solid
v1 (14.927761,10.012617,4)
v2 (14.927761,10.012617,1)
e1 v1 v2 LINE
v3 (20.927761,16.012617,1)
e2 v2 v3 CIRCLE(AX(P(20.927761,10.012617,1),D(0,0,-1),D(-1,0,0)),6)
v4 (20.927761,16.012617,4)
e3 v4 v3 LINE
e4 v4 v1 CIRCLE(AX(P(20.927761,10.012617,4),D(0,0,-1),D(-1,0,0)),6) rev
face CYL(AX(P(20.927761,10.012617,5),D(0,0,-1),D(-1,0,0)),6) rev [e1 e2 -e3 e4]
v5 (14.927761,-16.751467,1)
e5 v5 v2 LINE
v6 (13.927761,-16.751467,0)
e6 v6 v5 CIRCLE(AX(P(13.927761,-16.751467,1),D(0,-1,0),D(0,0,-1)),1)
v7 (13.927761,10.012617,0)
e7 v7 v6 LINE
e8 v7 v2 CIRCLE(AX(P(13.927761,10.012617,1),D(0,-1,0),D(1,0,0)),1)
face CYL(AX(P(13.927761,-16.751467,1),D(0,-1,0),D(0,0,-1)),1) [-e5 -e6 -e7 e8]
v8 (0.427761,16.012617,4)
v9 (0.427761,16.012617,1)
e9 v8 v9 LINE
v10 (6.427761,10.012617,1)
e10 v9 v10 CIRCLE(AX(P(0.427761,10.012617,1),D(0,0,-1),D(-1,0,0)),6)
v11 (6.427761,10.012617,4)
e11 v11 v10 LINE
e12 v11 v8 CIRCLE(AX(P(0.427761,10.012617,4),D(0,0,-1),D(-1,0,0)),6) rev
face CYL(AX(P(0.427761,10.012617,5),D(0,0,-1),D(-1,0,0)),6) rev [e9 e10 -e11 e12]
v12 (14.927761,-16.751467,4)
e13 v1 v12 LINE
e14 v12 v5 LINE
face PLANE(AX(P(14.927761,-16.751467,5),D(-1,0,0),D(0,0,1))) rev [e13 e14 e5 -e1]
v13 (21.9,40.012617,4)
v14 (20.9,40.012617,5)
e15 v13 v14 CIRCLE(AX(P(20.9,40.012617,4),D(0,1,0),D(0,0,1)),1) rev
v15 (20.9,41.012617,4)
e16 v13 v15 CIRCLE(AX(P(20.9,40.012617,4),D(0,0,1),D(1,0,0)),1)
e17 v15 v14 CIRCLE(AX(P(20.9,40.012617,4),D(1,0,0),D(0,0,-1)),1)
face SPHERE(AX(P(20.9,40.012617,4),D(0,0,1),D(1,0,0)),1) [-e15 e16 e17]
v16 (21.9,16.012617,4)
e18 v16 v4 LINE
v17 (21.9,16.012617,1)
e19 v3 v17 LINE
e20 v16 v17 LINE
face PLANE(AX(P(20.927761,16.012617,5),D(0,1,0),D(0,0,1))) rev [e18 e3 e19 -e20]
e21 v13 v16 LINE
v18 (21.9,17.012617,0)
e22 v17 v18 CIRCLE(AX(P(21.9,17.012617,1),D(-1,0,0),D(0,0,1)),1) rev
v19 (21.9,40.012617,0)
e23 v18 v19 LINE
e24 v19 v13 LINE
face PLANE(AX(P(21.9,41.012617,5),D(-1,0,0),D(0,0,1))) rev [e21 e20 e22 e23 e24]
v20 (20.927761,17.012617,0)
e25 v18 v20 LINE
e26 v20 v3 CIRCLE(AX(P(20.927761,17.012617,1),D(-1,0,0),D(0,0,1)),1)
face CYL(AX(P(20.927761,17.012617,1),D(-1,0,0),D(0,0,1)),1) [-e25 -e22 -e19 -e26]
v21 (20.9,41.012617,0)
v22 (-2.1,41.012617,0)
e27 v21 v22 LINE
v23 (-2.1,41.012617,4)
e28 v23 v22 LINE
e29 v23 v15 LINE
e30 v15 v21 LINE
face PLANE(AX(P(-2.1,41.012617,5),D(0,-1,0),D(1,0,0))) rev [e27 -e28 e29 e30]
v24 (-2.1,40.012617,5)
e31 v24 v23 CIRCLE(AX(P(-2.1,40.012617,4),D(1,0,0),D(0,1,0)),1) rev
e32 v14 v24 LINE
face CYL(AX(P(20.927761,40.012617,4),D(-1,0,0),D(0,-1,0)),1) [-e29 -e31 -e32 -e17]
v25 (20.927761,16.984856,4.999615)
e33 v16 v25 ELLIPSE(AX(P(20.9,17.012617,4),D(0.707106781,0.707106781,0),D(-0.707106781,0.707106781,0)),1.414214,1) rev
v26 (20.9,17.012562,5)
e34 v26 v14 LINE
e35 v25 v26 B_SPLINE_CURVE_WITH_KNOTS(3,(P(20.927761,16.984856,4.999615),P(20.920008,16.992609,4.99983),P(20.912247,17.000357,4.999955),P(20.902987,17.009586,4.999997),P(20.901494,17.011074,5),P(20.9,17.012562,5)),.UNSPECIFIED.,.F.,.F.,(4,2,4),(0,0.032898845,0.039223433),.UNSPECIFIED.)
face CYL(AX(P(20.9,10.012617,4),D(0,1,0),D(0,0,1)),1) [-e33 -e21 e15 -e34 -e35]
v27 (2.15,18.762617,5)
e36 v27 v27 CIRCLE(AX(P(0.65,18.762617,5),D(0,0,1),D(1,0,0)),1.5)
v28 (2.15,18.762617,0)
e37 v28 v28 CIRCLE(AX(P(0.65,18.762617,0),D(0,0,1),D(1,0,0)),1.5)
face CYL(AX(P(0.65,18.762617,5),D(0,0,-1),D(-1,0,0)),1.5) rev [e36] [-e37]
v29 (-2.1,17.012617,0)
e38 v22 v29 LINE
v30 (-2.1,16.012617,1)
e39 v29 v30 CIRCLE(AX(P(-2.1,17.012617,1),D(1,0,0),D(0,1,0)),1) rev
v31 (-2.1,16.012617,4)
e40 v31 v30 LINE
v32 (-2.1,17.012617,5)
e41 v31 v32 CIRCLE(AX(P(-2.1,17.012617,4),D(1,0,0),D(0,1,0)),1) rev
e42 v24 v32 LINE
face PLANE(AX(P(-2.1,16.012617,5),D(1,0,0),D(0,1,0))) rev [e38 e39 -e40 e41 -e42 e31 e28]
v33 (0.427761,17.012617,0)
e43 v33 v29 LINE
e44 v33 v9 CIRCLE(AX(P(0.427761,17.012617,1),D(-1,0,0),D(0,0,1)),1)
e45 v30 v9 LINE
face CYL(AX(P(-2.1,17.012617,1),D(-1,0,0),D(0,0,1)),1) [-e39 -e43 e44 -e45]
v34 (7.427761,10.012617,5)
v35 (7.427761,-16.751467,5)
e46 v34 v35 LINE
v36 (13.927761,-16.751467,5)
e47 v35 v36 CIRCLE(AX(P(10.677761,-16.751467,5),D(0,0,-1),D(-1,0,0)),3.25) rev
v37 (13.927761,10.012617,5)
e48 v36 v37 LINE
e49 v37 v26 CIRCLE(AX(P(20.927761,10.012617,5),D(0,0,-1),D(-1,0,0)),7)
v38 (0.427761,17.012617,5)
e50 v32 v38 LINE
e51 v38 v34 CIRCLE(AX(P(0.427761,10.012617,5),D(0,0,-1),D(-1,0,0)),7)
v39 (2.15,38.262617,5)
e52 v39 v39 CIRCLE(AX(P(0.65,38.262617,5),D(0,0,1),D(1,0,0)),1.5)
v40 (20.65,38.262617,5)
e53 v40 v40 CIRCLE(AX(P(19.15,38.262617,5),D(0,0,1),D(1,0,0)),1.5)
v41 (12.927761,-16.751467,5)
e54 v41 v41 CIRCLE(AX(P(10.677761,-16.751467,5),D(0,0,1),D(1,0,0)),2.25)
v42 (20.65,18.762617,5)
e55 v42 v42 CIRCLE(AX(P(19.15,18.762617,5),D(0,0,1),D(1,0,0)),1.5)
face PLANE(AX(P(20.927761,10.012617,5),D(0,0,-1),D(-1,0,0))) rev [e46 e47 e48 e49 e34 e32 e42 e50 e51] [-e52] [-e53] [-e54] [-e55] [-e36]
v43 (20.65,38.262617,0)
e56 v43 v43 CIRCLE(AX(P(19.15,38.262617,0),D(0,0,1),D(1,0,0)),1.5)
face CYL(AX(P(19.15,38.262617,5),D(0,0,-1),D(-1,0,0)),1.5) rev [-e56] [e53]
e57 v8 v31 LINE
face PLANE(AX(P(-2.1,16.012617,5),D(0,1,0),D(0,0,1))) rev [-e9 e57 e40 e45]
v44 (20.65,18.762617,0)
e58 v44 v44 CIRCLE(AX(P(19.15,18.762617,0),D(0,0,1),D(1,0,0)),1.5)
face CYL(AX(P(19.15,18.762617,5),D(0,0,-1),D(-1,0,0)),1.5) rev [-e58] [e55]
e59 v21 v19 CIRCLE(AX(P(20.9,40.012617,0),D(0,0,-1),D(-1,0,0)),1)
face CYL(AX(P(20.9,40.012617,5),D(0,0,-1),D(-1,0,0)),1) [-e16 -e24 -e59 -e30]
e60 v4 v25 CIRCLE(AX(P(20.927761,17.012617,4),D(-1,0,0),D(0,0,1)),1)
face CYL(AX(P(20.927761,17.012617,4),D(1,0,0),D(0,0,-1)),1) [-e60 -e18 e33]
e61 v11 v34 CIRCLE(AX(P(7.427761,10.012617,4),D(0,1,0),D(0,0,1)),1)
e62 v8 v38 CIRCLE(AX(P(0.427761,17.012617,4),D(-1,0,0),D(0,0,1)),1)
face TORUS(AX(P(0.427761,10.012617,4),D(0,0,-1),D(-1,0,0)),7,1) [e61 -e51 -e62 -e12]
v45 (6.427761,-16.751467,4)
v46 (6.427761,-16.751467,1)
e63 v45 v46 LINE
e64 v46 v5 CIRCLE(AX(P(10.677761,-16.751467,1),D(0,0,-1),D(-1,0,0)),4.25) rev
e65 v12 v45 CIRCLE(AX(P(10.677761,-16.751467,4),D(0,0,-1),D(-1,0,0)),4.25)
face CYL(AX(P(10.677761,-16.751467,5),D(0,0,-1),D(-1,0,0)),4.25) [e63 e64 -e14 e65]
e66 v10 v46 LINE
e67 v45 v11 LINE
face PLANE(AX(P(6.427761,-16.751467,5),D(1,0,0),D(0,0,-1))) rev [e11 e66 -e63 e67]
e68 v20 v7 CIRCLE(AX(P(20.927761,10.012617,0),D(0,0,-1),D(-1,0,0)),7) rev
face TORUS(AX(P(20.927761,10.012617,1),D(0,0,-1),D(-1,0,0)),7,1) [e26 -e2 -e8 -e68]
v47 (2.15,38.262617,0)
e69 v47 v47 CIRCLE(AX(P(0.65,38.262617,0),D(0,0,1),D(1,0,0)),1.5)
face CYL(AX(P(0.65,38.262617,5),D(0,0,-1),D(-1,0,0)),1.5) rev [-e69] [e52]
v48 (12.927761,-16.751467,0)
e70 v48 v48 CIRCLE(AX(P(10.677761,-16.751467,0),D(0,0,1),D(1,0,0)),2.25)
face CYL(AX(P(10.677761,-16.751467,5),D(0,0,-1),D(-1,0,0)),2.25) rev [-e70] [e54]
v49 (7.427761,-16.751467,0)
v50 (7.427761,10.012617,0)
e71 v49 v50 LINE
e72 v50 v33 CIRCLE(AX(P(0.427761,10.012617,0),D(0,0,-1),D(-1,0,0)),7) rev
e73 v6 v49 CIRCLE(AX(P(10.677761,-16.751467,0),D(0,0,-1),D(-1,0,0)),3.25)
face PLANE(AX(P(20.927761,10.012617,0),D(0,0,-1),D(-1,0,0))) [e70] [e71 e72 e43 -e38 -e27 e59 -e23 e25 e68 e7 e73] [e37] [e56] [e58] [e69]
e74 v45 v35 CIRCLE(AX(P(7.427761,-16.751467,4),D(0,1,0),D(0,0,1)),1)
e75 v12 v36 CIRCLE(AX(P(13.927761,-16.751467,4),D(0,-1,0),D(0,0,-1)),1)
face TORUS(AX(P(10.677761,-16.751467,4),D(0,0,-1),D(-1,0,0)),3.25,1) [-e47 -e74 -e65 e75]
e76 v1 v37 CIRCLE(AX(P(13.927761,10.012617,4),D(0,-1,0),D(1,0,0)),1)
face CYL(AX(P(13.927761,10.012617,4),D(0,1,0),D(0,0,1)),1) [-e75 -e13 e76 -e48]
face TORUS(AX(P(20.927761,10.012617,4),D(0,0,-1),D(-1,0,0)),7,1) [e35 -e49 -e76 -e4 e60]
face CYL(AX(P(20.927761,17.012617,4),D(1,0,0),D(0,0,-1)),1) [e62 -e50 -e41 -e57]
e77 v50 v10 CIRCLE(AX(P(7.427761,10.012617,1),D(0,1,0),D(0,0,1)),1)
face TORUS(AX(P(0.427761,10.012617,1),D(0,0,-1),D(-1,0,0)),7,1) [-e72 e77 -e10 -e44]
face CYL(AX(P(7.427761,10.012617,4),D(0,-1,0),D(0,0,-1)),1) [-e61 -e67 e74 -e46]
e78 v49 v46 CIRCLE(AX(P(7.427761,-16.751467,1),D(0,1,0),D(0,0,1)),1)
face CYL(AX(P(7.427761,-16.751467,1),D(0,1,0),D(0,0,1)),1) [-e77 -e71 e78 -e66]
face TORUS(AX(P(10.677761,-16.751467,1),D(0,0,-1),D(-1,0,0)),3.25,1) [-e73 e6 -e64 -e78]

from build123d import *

# Parameters (mm, degrees)
CROQUIS1_R              = 2.2500000000000027
CROQUIS1_R_2            = 1.5000000000000013
CROQUIS1_R_3            = 1.5000000000000009
CROQUIS1_R_4            = 1.4999999999999967
SALIENTE_EXTRUIR1_DEPTH = 5
REDONDEO1_R             = 1


with BuildPart() as part:
    # Croquis1 → Saliente-Extruir1 (new body)
    with BuildSketch(Plane.XY):
        with BuildLine():
            Line((-2.100000000000147, 41.01261693614467), (21.89999999999985, 41.01261693614466))
            Line((21.89999999999985, 41.01261693614466), (21.89999999999985, 16.01261693614466))
            Line((21.89999999999985, 16.01261693614466), (20.92776114455846, 16.01261693614466))
            ThreePointArc((20.92776114455846, 16.01261693614466), (16.68512045743913, 14.255257623263944), (14.927761144558415, 10.012616936144616))
            Line((14.927761144558415, 10.012616936144616), (14.927761144558415, -16.751467205989318))
            ThreePointArc((14.927761144558415, -16.751467205989318), (10.677761144558414, -21.001467205989325), (6.427761144558411, -16.751467205989318))
            Line((6.427761144558411, -16.751467205989318), (6.427761144558411, 10.012616936144616))
            ThreePointArc((6.427761144558411, 10.012616936144616), (4.670401831677697, 14.255257623263944), (0.42776114455836833, 16.01261693614466))
            Line((0.42776114455836833, 16.01261693614466), (-2.100000000000148, 16.01261693614466))
            Line((-2.100000000000148, 16.01261693614466), (-2.100000000000147, 41.01261693614467))
        make_face()
        with Locations((10.677761144558414, -16.751467205989318)):
            Circle(CROQUIS1_R, mode=Mode.SUBTRACT)
        with Locations((0.6499999999998556, 38.26261693614465)):
            Circle(CROQUIS1_R_2, mode=Mode.SUBTRACT)
        with Locations((19.1499999999999, 38.26261693614465)):
            Circle(CROQUIS1_R_3, mode=Mode.SUBTRACT)
        with Locations((19.1499999999999, 18.76261693614465)):
            Circle(CROQUIS1_R_4, mode=Mode.SUBTRACT)
        with Locations((0.6499999999998556, 18.76261693614465)):
            Circle(CROQUIS1_R_2, mode=Mode.SUBTRACT)
    extrude(amount=SALIENTE_EXTRUIR1_DEPTH)

    # Redondeo1
    # the kernel refuses this fillet: 1 mm, written as the material it takes off along each edge
    with BuildSketch(Plane(origin=(20.89999999999985, 40.01261693614466, 4), x_dir=(3e-16, 1, 0), z_dir=(0, 0, 1))) as redondeo1_piece_1_section:
        Polygon((0, 0), (REDONDEO1_R, 0), (REDONDEO1_R, -REDONDEO1_R), (3e-16, -REDONDEO1_R), align=None)
    redondeo1_piece_1 = extrude(amount=REDONDEO1_R, mode=Mode.PRIVATE)
    redondeo1_piece_1 = redondeo1_piece_1 - Plane(origin=(20.89999999999985, 40.01261693614466, 4), x_dir=(-0.7071067811865477, -0.7071067811865475, 0), z_dir=(0, 0, 1)) * Sphere(REDONDEO1_R, mode=Mode.PRIVATE)
    add(redondeo1_piece_1, mode=Mode.SUBTRACT)
    with BuildSketch(Plane(origin=(0.42776114455836833, 16.01261693614466, 0), x_dir=(0, 0, 1), z_dir=(-1, 0, 0))) as redondeo1_piece_2:
        with BuildLine():
            CenterArc((REDONDEO1_R, REDONDEO1_R), REDONDEO1_R, 180, 90)
            Line((-1.1e-16, REDONDEO1_R), (0, 0))
            Line((0, 0), (REDONDEO1_R, 0))
        make_face()
    extrude(amount=5.027761144558516, mode=Mode.SUBTRACT)
    with BuildSketch(Plane(origin=(24.39999999999985, 16.01261693614466, 0), x_dir=(0, 0, 1), z_dir=(-1, 0, 0))) as redondeo1_piece_3:
        with BuildLine():
            CenterArc((REDONDEO1_R, REDONDEO1_R), REDONDEO1_R, 180, 90)
            Line((-1.1e-16, REDONDEO1_R), (0, 0))
            Line((0, 0), (REDONDEO1_R, 0))
        make_face()
    extrude(amount=3.4722388554413897, mode=Mode.SUBTRACT)
    with BuildSketch(Plane(origin=(20.927761144558417, 10.012616936144658, 0), x_dir=(7.11e-15, 1, 0), z_dir=(1, -7.11e-15, 0))) as redondeo1_piece_4:
        with BuildLine():
            CenterArc((6.000000000000002 + REDONDEO1_R, REDONDEO1_R), REDONDEO1_R, 180, 90)
            Line((6.000000000000002 + REDONDEO1_R, -1.1e-16), (6.000000000000002, 0))
            Line((6.000000000000002, 0), (6.000000000000002, REDONDEO1_R))
        make_face()
    revolve(axis=Axis((20.927761144558417, 10.012616936144658, 0), (0, 0, 1)), revolution_arc=90.00000000000081, mode=Mode.SUBTRACT)
    with BuildSketch(Plane(origin=(14.927761144558415, 10.012616936144616, 0), x_dir=(0, 0, 1), z_dir=(0, -1, 0))) as redondeo1_piece_5:
        with BuildLine():
            CenterArc((REDONDEO1_R, REDONDEO1_R), REDONDEO1_R, 180, 90)
            Line((-1.1e-16, REDONDEO1_R), (0, 0))
            Line((0, 0), (REDONDEO1_R, 0))
        make_face()
    extrude(amount=26.76408414213393, mode=Mode.SUBTRACT)
    with BuildSketch(Plane(origin=(10.677761144558414, -16.75146720598932, 0), x_dir=(1, 8.4e-16, 0), z_dir=(-8.4e-16, 1, 0))) as redondeo1_piece_6:
        with BuildLine():
            CenterArc((4.2500000000000036 - REDONDEO1_R, -REDONDEO1_R), REDONDEO1_R, 0, 90)
            Line((4.2500000000000036 - REDONDEO1_R, 1.1e-16), (4.2500000000000036, 0))
            Line((4.2500000000000036, 0), (4.2500000000000036, -REDONDEO1_R))
        make_face()
    revolve(axis=Axis((10.677761144558414, -16.75146720598932, 0), (0, 0, -1)), revolution_arc=180.0000000000001, mode=Mode.SUBTRACT)
    with BuildSketch(Plane(origin=(6.427761144558411, -16.751467205989318, 0), x_dir=(0, 0, 1), z_dir=(0, 1, 0))) as redondeo1_piece_7:
        with BuildLine():
            CenterArc((REDONDEO1_R, REDONDEO1_R), REDONDEO1_R, 180, 90)
            Line((-1.1e-16, REDONDEO1_R), (0, 0))
            Line((0, 0), (REDONDEO1_R, 0))
        make_face()
    extrude(amount=26.76408414213393, mode=Mode.SUBTRACT)
    with BuildSketch(Plane(origin=(0.42776114455836833, 16.01261693614466, 5), x_dir=(0, 0, -1), z_dir=(-1, 0, 0))) as redondeo1_piece_8:
        with BuildLine():
            CenterArc((REDONDEO1_R, -REDONDEO1_R), REDONDEO1_R, 90, 90)
            Line((0, -REDONDEO1_R), (0, 0))
            Line((0, 0), (REDONDEO1_R, 0))
        make_face()
    extrude(amount=5.027761144558516, mode=Mode.SUBTRACT)
    with BuildSketch(Plane(origin=(0.4277611445584084, 10.012616936144658, 5), x_dir=(1, -7.11e-15, 0), z_dir=(-7.11e-15, -1, 0))) as redondeo1_piece_9:
        with BuildLine():
            CenterArc((6.000000000000003 + REDONDEO1_R, -REDONDEO1_R), REDONDEO1_R, 90, 90)
            Line((6.000000000000003 + REDONDEO1_R, 0), (6.000000000000003, 0))
            Line((6.000000000000003, 0), (6.000000000000003, -REDONDEO1_R))
        make_face()
    revolve(axis=Axis((0.4277611445584084, 10.012616936144658, 5), (0, 0, 1)), revolution_arc=90.00000000000078, mode=Mode.SUBTRACT)
    with BuildSketch(Plane(origin=(20.927761144558417, 10.012616936144658, 5), x_dir=(7.11e-15, 1, 0), z_dir=(1, -7.11e-15, 0))) as redondeo1_piece_10:
        with BuildLine():
            CenterArc((6.000000000000002 + REDONDEO1_R, -REDONDEO1_R), REDONDEO1_R, 90, 90)
            Line((6.000000000000002 + REDONDEO1_R, 0), (6.000000000000002, 0))
            Line((6.000000000000002, 0), (6.000000000000002, -REDONDEO1_R))
        make_face()
    revolve(axis=Axis((20.927761144558417, 10.012616936144658, 5), (0, 0, 1)), revolution_arc=90.00000000000081, mode=Mode.SUBTRACT)
    with BuildSketch(Plane(origin=(14.927761144558415, 10.012616936144616, 5), x_dir=(0, 0, -1), z_dir=(0, -1, 0))) as redondeo1_piece_11:
        with BuildLine():
            CenterArc((REDONDEO1_R, -REDONDEO1_R), REDONDEO1_R, 90, 90)
            Line((0, -REDONDEO1_R), (0, 0))
            Line((0, 0), (REDONDEO1_R, 0))
        make_face()
    extrude(amount=26.76408414213393, mode=Mode.SUBTRACT)
    with BuildSketch(Plane(origin=(10.677761144558414, -16.75146720598932, 5), x_dir=(1, 8.4e-16, 0), z_dir=(-8.4e-16, 1, 0))) as redondeo1_piece_12:
        with BuildLine():
            CenterArc((4.2500000000000036 - REDONDEO1_R, REDONDEO1_R), REDONDEO1_R, 270, 90)
            Line((4.2500000000000036 - REDONDEO1_R, 0), (4.2500000000000036, 0))
            Line((4.2500000000000036, 0), (4.2500000000000036, REDONDEO1_R))
        make_face()
    revolve(axis=Axis((10.677761144558414, -16.75146720598932, 5), (0, 0, -1)), revolution_arc=180.0000000000001, mode=Mode.SUBTRACT)
    with BuildSketch(Plane(origin=(0.4277611445584084, 10.012616936144658, 0), x_dir=(1, -7.11e-15, 0), z_dir=(-7.11e-15, -1, 0))) as redondeo1_piece_13:
        with BuildLine():
            CenterArc((6.000000000000003 + REDONDEO1_R, REDONDEO1_R), REDONDEO1_R, 180, 90)
            Line((6.000000000000003 + REDONDEO1_R, -1.1e-16), (6.000000000000003, 0))
            Line((6.000000000000003, 0), (6.000000000000003, REDONDEO1_R))
        make_face()
    revolve(axis=Axis((0.4277611445584084, 10.012616936144658, 0), (0, 0, 1)), revolution_arc=90.00000000000078, mode=Mode.SUBTRACT)
    with BuildSketch(Plane(origin=(21.89999999999985, 41.01261693614466, -2.5), x_dir=(-1, 0, 0), z_dir=(0, 0, 1))) as redondeo1_piece_14:
        with BuildLine():
            CenterArc((REDONDEO1_R, REDONDEO1_R), REDONDEO1_R, 180, 90)
            Line((0, REDONDEO1_R), (0, 0))
            Line((0, 0), (REDONDEO1_R, 0))
        make_face()
    extrude(amount=6.5, mode=Mode.SUBTRACT)
    with BuildSketch(Plane(origin=(-4.600000000000147, 41.01261693614467, 5), x_dir=(0, 0, -1), z_dir=(1, -3e-16, 0))) as redondeo1_piece_15:
        with BuildLine():
            CenterArc((REDONDEO1_R, -REDONDEO1_R), REDONDEO1_R, 90, 90)
            Line((0, -REDONDEO1_R), (0, 0))
            Line((0, 0), (REDONDEO1_R, 0))
        make_face()
    extrude(amount=25.499999999999996, mode=Mode.SUBTRACT)
    with BuildSketch(Plane(origin=(21.89999999999985, 40.01261693614466, 5), x_dir=(0, 0, -1), z_dir=(0, -1, 0))) as redondeo1_piece_16:
        with BuildLine():
            CenterArc((REDONDEO1_R, -REDONDEO1_R), REDONDEO1_R, 90, 90)
            Line((0, -REDONDEO1_R), (0, 0))
            Line((0, 0), (REDONDEO1_R, 0))
        make_face()
    extrude(amount=26.500000000000004, mode=Mode.SUBTRACT)
    with BuildSketch(Plane(origin=(6.427761144558411, -16.751467205989318, 5), x_dir=(0, 0, -1), z_dir=(0, 1, 0))) as redondeo1_piece_17:
        with BuildLine():
            CenterArc((REDONDEO1_R, -REDONDEO1_R), REDONDEO1_R, 90, 90)
            Line((0, -REDONDEO1_R), (0, 0))
            Line((0, 0), (REDONDEO1_R, 0))
        make_face()
    extrude(amount=26.76408414213393, mode=Mode.SUBTRACT)
    with BuildSketch(Plane(origin=(24.39999999999985, 16.01261693614466, 5), x_dir=(0, 0, -1), z_dir=(-1, 0, 0))) as redondeo1_piece_18:
        with BuildLine():
            CenterArc((REDONDEO1_R, -REDONDEO1_R), REDONDEO1_R, 90, 90)
            Line((0, -REDONDEO1_R), (0, 0))
            Line((0, 0), (REDONDEO1_R, 0))
        make_face()
    extrude(amount=3.4722388554413897, mode=Mode.SUBTRACT)


solid = part.part
